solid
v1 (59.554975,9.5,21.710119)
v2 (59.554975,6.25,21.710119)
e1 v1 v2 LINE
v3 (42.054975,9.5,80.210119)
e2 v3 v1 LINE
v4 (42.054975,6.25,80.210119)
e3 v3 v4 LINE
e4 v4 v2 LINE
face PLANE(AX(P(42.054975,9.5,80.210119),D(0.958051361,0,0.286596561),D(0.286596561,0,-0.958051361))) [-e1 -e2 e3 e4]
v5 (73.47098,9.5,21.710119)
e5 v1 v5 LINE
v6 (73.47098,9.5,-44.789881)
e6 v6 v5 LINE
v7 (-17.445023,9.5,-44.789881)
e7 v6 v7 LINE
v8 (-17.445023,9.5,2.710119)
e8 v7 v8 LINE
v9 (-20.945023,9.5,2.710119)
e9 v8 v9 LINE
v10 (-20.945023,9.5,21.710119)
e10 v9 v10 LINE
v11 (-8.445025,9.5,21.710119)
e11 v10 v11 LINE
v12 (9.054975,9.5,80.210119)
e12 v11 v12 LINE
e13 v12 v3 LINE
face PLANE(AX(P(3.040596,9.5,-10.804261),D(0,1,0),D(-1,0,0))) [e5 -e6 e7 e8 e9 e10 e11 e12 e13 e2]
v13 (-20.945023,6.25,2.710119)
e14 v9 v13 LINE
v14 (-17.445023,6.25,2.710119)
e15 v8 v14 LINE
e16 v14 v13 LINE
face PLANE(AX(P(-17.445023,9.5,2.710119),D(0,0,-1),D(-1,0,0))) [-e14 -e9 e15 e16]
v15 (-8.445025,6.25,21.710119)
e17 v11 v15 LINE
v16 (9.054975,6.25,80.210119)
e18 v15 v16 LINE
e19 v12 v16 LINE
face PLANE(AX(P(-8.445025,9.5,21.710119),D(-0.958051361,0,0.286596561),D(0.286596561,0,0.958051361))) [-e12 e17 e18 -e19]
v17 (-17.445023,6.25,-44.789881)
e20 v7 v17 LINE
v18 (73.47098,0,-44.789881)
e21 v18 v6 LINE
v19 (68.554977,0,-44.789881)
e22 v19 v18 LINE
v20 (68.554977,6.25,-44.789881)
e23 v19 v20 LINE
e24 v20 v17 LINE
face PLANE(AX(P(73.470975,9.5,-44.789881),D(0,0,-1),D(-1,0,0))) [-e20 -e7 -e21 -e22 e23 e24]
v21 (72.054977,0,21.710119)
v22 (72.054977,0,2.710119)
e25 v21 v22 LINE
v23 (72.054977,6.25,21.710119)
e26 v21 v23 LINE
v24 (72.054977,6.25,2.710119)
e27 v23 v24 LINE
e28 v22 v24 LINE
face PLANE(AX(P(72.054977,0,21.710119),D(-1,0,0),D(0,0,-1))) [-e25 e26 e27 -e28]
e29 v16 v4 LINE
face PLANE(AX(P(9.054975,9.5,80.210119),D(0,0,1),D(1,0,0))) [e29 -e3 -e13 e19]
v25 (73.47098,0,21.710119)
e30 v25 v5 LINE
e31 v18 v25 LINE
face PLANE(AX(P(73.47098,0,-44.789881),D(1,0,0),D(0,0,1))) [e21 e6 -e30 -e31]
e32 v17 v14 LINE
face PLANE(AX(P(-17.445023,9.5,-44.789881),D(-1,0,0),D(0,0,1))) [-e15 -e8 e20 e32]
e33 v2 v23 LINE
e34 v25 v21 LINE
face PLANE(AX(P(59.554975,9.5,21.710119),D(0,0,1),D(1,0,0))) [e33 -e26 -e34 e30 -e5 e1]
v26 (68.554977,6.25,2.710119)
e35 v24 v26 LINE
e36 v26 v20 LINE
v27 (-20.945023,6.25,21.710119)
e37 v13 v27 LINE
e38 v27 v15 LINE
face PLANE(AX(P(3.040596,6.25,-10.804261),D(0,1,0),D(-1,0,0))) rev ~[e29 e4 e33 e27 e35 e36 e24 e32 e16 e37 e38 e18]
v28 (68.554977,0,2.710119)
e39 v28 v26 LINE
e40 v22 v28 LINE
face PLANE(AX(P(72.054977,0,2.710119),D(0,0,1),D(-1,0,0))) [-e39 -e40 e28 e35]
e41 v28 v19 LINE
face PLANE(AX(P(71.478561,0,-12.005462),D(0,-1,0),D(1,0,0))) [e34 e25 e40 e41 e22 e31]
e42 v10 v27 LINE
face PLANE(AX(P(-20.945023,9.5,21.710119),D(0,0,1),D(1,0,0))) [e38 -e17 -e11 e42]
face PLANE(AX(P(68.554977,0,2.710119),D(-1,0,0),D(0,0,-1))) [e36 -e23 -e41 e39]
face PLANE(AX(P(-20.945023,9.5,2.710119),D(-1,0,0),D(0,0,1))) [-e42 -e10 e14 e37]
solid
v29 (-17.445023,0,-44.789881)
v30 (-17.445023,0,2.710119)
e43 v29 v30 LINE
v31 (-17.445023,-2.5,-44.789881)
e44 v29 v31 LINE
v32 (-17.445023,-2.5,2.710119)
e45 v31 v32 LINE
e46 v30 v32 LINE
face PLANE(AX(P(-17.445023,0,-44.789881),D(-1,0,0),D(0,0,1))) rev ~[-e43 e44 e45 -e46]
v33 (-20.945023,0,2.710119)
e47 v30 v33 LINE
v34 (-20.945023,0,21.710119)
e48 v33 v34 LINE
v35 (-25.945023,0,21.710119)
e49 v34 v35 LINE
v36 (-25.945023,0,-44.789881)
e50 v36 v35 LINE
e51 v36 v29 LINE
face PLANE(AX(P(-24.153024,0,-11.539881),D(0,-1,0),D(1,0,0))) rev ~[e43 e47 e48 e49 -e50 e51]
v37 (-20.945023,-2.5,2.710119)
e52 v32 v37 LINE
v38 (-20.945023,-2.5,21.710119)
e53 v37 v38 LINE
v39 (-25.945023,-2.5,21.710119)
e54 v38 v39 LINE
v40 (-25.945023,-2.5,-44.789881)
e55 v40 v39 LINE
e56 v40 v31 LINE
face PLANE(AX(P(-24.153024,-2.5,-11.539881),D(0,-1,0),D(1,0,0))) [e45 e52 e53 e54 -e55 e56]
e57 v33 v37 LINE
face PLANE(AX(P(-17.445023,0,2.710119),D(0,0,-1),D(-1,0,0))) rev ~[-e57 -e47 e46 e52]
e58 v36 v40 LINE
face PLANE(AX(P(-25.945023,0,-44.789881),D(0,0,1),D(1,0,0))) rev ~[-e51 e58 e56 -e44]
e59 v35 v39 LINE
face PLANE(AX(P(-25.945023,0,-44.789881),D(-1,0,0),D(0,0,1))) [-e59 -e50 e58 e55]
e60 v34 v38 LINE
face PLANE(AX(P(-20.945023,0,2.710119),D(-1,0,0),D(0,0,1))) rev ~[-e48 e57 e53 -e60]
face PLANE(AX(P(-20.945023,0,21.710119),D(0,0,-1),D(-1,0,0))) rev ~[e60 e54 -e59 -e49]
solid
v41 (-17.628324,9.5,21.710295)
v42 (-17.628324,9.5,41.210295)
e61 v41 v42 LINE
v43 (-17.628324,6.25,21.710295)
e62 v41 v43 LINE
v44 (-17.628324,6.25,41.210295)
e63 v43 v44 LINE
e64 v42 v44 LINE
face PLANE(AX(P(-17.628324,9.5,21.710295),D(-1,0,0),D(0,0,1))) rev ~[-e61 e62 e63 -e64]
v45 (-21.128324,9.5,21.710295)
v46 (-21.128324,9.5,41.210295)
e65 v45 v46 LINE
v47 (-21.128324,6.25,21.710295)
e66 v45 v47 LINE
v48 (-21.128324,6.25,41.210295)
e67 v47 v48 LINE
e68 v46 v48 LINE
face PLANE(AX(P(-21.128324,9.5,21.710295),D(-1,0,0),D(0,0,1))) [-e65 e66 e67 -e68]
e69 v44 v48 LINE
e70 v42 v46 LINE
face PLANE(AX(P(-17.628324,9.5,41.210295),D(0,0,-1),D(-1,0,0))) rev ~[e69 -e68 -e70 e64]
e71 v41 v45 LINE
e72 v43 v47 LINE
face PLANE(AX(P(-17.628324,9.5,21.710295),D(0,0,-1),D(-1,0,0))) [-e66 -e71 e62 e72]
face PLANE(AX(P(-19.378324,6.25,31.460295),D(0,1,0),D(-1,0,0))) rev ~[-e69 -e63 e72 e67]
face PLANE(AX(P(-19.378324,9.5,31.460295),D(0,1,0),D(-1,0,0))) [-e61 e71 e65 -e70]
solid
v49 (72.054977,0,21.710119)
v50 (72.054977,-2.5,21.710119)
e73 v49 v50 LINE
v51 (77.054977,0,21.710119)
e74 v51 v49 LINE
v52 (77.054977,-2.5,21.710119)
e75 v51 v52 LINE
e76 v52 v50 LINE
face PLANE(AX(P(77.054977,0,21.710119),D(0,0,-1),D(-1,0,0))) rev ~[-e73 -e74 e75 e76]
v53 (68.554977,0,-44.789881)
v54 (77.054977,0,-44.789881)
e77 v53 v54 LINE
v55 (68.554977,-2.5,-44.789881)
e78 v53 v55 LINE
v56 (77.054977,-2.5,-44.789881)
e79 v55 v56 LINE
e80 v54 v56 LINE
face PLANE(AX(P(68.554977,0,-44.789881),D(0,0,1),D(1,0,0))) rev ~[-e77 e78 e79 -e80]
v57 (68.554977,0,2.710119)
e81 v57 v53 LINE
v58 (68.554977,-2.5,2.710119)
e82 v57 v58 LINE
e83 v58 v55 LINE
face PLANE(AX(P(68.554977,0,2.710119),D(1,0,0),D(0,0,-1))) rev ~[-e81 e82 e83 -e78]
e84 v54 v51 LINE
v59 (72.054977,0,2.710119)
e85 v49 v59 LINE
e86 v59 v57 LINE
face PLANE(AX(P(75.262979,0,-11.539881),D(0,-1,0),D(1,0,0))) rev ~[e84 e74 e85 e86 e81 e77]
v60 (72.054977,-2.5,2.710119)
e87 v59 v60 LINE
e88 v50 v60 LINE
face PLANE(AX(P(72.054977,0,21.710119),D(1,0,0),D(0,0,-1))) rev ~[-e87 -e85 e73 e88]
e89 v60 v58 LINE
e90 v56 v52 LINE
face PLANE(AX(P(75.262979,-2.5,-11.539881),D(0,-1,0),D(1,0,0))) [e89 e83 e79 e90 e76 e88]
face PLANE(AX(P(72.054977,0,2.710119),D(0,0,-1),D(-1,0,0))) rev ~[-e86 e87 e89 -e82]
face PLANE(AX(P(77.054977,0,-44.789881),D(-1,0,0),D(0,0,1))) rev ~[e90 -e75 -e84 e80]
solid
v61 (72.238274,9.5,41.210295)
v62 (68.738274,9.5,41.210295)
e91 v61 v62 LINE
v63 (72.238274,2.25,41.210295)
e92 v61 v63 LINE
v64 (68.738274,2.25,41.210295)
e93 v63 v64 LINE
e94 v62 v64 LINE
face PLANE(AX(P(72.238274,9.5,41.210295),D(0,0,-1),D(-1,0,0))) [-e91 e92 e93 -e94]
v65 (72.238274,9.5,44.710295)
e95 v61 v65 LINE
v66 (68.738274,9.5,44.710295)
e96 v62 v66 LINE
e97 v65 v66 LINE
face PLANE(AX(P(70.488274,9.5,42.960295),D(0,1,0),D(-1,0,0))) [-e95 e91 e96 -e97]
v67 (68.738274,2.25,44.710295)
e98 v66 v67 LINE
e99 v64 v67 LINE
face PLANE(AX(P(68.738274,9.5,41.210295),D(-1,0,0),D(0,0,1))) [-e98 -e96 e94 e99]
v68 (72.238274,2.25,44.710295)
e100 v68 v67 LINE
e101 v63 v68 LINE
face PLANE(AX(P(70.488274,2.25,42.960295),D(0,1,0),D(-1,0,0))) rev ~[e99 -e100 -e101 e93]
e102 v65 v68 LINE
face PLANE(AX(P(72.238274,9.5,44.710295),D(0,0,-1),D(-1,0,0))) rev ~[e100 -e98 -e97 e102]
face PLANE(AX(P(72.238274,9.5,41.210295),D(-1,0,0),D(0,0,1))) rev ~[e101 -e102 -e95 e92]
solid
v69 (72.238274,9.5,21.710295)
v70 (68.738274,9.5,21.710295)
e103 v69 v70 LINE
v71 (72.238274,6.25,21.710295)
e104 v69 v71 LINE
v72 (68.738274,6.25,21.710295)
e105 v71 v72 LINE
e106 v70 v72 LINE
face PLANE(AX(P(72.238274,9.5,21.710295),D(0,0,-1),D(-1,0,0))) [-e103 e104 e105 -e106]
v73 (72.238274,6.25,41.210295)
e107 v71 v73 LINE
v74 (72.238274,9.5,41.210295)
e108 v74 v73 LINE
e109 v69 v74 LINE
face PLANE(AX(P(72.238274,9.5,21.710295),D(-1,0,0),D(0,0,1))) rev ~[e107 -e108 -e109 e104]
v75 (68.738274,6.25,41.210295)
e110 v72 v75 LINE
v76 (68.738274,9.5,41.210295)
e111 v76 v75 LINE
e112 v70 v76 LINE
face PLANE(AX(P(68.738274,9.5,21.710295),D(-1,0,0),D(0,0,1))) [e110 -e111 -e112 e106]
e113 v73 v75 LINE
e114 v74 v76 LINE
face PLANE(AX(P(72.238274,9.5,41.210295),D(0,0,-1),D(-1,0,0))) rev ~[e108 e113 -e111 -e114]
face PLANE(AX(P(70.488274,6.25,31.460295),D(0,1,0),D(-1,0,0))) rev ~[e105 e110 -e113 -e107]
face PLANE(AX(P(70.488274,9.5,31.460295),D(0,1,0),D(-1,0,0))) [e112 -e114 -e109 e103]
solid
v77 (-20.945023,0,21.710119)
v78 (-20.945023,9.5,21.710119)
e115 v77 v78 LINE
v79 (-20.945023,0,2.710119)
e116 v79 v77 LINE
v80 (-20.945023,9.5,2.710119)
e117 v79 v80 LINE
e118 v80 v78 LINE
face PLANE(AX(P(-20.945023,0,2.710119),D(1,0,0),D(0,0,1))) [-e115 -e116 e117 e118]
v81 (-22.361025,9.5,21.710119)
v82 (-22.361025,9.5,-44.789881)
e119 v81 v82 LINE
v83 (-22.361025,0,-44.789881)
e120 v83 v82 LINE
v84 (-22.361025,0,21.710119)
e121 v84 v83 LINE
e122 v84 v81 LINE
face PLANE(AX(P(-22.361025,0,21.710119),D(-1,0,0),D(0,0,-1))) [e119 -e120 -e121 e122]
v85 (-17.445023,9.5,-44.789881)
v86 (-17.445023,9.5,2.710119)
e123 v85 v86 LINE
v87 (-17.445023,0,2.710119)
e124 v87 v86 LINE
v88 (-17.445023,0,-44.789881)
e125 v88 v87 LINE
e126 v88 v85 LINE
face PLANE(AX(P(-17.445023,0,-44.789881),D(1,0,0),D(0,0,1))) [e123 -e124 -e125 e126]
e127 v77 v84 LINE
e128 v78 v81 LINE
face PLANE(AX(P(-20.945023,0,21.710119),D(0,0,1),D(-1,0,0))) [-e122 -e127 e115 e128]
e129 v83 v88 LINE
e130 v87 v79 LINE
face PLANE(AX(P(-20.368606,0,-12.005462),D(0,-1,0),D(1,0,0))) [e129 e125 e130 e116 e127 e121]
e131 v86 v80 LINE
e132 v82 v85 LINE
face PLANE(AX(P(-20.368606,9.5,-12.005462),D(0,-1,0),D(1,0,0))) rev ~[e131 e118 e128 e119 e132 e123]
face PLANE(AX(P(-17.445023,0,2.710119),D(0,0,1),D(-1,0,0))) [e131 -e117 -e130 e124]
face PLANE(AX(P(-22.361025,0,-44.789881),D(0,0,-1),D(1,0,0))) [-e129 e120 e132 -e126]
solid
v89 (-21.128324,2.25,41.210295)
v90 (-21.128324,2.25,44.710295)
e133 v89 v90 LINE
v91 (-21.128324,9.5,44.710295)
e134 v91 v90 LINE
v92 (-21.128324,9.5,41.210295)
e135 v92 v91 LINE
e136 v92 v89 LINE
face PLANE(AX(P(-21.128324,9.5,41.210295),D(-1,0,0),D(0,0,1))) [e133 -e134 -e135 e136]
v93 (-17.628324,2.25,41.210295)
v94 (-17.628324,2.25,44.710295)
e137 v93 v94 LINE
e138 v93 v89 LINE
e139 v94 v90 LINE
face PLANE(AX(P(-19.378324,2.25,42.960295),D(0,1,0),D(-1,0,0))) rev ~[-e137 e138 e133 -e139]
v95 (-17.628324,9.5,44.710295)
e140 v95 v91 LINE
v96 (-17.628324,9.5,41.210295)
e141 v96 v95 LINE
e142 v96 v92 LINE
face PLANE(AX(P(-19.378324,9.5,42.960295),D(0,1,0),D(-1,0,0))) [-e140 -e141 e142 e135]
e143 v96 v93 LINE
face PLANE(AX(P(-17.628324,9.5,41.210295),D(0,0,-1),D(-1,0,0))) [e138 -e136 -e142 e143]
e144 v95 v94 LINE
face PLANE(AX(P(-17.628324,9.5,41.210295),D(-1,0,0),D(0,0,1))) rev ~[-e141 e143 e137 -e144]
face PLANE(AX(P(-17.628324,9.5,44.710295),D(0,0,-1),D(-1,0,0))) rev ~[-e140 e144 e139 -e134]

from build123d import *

# Parameters (mm, degrees)
F0_W     = 3.5839973688
F0_H     = 66.5
F1_DEPTH = 2.5
F2_DEPTH = 9.5
F4_DEPTH = 3.25
F5_W     = 3.5
F5_H     = 19.5
F6_DEPTH = 3.25
F5_H_2   = 3.5
F7_DEPTH = 7.25


# Not quite as in the source:
# - a feature names something its author has since deleted; it is built from what else it names


with BuildPart() as f1:
    # F0 (on Front) → F1 (new body)
    with BuildSketch(Plane.XZ):
        with Locations((-24.1530238986, -11.5398805141)):
            Rectangle(F0_W, F0_H)
        Polygon((-20.945022583, 21.7101194859), (-22.3610252142, 21.7101194859), (-22.3610252142, -44.7898805141), (-17.445022583, -44.7898805141), (-17.445022583, 2.7101194859), (-20.945022583, 2.7101194859), align=None)
    extrude(amount=F1_DEPTH)


with BuildPart() as f1b:
    # F0 (on Front) → F1, piece 2 (new body)
    with BuildSketch(Plane.XZ):
        with Locations((75.2629787326, -11.5398805141)):
            Rectangle(F0_W, F0_H)
        Polygon((68.554977417, 2.7101194859), (68.554977417, -44.7898805141), (73.4709800482, -44.7898805141), (73.4709800482, 21.7101194859), (72.054977417, 21.7101194859), (72.054977417, 2.7101194859), align=None)
    extrude(amount=F1_DEPTH)


with BuildPart() as f2:
    # F0 (on Front) → F2 (new body)
    with BuildSketch(Plane.XZ):
        Polygon((-20.945022583, 21.7101194859), (-22.3610252142, 21.7101194859), (-22.3610252142, -44.7898805141), (-17.445022583, -44.7898805141), (-17.445022583, 2.7101194859), (-20.945022583, 2.7101194859), align=None)
    extrude(amount=-F2_DEPTH)


with BuildPart() as f2b:
    # F0 (on Front) → F2, piece 2 (new body)
    with BuildSketch(Plane.XZ):
        Polygon((68.554977417, 2.7101194859), (68.554977417, -44.7898805141), (73.4709800482, -44.7898805141), (73.4709800482, 21.7101194859), (72.054977417, 21.7101194859), (72.054977417, 2.7101194859), align=None)
    extrude(amount=-F2_DEPTH)

    # F3 (on face) → F4 (join)
    with BuildSketch(Plane(origin=(0, 9.5, 0), x_dir=(-1, 0, 0), z_dir=(0, 1, 0))):
        Polygon((20.945022583, 2.7101194859), (20.945022583, 21.7101194859), (8.4450252142, 21.7101194859), (-25.5549747858, 21.7101194859), (-25.5549747858, -44.7898805141), (17.445022583, -44.7898805141), (17.445022583, 2.7101194859), align=None)
        Polygon((-25.5549747858, 21.7101194859), (8.4450252142, 21.7101194859), (-9.0549747858, 80.2101194859), (-25.5549747858, 80.2101194859), align=None)
        Polygon((-59.5549747858, 21.7101194859), (-25.5549747858, 21.7101194859), (-25.5549747858, 80.2101194859), (-42.0549747858, 80.2101194859), align=None)
        Polygon((-73.4709747858, -44.7898805141), (-25.5549747858, -44.7898805141), (-25.5549747858, 21.7101194859), (-59.5549747858, 21.7101194859), (-73.4709747858, 21.7101194859), align=None)
    extrude(amount=-F4_DEPTH)


with BuildPart() as f6:
    # F5 (on face) → F6 (new body)
    with BuildSketch(Plane(origin=(0, 9.5, 0), x_dir=(-1, 0, 0), z_dir=(0, 1, 0))):
        with Locations((-70.4882739186, 31.4602952302)):
            Rectangle(F5_W, F5_H)
    extrude(amount=-F6_DEPTH)


with BuildPart() as f6b:
    # F5 (on face) → F6, piece 2 (new body)
    with BuildSketch(Plane(origin=(0, 9.5, 0), x_dir=(-1, 0, 0), z_dir=(0, 1, 0))):
        with Locations((19.378324347, 31.4602952302)):
            Rectangle(F5_W, F5_H)
    extrude(amount=-F6_DEPTH)


with BuildPart() as f7:
    # F5 (on face) → F7 (new body)
    with BuildSketch(Plane(origin=(0, 9.5, 0), x_dir=(-1, 0, 0), z_dir=(0, 1, 0))):
        with Locations((-70.4882739186, 42.9602952302)):
            Rectangle(F5_W, F5_H_2)
    extrude(amount=-F7_DEPTH)


with BuildPart() as f7b:
    # F5 (on face) → F7, piece 2 (new body)
    with BuildSketch(Plane(origin=(0, 9.5, 0), x_dir=(-1, 0, 0), z_dir=(0, 1, 0))):
        with Locations((19.378324347, 42.9602952302)):
            Rectangle(F5_W, F5_H_2)
    extrude(amount=-F7_DEPTH)


solid = Compound([f1.part, f1b.part, f2.part, f2b.part, f6.part, f6b.part, f7.part, f7b.part])
